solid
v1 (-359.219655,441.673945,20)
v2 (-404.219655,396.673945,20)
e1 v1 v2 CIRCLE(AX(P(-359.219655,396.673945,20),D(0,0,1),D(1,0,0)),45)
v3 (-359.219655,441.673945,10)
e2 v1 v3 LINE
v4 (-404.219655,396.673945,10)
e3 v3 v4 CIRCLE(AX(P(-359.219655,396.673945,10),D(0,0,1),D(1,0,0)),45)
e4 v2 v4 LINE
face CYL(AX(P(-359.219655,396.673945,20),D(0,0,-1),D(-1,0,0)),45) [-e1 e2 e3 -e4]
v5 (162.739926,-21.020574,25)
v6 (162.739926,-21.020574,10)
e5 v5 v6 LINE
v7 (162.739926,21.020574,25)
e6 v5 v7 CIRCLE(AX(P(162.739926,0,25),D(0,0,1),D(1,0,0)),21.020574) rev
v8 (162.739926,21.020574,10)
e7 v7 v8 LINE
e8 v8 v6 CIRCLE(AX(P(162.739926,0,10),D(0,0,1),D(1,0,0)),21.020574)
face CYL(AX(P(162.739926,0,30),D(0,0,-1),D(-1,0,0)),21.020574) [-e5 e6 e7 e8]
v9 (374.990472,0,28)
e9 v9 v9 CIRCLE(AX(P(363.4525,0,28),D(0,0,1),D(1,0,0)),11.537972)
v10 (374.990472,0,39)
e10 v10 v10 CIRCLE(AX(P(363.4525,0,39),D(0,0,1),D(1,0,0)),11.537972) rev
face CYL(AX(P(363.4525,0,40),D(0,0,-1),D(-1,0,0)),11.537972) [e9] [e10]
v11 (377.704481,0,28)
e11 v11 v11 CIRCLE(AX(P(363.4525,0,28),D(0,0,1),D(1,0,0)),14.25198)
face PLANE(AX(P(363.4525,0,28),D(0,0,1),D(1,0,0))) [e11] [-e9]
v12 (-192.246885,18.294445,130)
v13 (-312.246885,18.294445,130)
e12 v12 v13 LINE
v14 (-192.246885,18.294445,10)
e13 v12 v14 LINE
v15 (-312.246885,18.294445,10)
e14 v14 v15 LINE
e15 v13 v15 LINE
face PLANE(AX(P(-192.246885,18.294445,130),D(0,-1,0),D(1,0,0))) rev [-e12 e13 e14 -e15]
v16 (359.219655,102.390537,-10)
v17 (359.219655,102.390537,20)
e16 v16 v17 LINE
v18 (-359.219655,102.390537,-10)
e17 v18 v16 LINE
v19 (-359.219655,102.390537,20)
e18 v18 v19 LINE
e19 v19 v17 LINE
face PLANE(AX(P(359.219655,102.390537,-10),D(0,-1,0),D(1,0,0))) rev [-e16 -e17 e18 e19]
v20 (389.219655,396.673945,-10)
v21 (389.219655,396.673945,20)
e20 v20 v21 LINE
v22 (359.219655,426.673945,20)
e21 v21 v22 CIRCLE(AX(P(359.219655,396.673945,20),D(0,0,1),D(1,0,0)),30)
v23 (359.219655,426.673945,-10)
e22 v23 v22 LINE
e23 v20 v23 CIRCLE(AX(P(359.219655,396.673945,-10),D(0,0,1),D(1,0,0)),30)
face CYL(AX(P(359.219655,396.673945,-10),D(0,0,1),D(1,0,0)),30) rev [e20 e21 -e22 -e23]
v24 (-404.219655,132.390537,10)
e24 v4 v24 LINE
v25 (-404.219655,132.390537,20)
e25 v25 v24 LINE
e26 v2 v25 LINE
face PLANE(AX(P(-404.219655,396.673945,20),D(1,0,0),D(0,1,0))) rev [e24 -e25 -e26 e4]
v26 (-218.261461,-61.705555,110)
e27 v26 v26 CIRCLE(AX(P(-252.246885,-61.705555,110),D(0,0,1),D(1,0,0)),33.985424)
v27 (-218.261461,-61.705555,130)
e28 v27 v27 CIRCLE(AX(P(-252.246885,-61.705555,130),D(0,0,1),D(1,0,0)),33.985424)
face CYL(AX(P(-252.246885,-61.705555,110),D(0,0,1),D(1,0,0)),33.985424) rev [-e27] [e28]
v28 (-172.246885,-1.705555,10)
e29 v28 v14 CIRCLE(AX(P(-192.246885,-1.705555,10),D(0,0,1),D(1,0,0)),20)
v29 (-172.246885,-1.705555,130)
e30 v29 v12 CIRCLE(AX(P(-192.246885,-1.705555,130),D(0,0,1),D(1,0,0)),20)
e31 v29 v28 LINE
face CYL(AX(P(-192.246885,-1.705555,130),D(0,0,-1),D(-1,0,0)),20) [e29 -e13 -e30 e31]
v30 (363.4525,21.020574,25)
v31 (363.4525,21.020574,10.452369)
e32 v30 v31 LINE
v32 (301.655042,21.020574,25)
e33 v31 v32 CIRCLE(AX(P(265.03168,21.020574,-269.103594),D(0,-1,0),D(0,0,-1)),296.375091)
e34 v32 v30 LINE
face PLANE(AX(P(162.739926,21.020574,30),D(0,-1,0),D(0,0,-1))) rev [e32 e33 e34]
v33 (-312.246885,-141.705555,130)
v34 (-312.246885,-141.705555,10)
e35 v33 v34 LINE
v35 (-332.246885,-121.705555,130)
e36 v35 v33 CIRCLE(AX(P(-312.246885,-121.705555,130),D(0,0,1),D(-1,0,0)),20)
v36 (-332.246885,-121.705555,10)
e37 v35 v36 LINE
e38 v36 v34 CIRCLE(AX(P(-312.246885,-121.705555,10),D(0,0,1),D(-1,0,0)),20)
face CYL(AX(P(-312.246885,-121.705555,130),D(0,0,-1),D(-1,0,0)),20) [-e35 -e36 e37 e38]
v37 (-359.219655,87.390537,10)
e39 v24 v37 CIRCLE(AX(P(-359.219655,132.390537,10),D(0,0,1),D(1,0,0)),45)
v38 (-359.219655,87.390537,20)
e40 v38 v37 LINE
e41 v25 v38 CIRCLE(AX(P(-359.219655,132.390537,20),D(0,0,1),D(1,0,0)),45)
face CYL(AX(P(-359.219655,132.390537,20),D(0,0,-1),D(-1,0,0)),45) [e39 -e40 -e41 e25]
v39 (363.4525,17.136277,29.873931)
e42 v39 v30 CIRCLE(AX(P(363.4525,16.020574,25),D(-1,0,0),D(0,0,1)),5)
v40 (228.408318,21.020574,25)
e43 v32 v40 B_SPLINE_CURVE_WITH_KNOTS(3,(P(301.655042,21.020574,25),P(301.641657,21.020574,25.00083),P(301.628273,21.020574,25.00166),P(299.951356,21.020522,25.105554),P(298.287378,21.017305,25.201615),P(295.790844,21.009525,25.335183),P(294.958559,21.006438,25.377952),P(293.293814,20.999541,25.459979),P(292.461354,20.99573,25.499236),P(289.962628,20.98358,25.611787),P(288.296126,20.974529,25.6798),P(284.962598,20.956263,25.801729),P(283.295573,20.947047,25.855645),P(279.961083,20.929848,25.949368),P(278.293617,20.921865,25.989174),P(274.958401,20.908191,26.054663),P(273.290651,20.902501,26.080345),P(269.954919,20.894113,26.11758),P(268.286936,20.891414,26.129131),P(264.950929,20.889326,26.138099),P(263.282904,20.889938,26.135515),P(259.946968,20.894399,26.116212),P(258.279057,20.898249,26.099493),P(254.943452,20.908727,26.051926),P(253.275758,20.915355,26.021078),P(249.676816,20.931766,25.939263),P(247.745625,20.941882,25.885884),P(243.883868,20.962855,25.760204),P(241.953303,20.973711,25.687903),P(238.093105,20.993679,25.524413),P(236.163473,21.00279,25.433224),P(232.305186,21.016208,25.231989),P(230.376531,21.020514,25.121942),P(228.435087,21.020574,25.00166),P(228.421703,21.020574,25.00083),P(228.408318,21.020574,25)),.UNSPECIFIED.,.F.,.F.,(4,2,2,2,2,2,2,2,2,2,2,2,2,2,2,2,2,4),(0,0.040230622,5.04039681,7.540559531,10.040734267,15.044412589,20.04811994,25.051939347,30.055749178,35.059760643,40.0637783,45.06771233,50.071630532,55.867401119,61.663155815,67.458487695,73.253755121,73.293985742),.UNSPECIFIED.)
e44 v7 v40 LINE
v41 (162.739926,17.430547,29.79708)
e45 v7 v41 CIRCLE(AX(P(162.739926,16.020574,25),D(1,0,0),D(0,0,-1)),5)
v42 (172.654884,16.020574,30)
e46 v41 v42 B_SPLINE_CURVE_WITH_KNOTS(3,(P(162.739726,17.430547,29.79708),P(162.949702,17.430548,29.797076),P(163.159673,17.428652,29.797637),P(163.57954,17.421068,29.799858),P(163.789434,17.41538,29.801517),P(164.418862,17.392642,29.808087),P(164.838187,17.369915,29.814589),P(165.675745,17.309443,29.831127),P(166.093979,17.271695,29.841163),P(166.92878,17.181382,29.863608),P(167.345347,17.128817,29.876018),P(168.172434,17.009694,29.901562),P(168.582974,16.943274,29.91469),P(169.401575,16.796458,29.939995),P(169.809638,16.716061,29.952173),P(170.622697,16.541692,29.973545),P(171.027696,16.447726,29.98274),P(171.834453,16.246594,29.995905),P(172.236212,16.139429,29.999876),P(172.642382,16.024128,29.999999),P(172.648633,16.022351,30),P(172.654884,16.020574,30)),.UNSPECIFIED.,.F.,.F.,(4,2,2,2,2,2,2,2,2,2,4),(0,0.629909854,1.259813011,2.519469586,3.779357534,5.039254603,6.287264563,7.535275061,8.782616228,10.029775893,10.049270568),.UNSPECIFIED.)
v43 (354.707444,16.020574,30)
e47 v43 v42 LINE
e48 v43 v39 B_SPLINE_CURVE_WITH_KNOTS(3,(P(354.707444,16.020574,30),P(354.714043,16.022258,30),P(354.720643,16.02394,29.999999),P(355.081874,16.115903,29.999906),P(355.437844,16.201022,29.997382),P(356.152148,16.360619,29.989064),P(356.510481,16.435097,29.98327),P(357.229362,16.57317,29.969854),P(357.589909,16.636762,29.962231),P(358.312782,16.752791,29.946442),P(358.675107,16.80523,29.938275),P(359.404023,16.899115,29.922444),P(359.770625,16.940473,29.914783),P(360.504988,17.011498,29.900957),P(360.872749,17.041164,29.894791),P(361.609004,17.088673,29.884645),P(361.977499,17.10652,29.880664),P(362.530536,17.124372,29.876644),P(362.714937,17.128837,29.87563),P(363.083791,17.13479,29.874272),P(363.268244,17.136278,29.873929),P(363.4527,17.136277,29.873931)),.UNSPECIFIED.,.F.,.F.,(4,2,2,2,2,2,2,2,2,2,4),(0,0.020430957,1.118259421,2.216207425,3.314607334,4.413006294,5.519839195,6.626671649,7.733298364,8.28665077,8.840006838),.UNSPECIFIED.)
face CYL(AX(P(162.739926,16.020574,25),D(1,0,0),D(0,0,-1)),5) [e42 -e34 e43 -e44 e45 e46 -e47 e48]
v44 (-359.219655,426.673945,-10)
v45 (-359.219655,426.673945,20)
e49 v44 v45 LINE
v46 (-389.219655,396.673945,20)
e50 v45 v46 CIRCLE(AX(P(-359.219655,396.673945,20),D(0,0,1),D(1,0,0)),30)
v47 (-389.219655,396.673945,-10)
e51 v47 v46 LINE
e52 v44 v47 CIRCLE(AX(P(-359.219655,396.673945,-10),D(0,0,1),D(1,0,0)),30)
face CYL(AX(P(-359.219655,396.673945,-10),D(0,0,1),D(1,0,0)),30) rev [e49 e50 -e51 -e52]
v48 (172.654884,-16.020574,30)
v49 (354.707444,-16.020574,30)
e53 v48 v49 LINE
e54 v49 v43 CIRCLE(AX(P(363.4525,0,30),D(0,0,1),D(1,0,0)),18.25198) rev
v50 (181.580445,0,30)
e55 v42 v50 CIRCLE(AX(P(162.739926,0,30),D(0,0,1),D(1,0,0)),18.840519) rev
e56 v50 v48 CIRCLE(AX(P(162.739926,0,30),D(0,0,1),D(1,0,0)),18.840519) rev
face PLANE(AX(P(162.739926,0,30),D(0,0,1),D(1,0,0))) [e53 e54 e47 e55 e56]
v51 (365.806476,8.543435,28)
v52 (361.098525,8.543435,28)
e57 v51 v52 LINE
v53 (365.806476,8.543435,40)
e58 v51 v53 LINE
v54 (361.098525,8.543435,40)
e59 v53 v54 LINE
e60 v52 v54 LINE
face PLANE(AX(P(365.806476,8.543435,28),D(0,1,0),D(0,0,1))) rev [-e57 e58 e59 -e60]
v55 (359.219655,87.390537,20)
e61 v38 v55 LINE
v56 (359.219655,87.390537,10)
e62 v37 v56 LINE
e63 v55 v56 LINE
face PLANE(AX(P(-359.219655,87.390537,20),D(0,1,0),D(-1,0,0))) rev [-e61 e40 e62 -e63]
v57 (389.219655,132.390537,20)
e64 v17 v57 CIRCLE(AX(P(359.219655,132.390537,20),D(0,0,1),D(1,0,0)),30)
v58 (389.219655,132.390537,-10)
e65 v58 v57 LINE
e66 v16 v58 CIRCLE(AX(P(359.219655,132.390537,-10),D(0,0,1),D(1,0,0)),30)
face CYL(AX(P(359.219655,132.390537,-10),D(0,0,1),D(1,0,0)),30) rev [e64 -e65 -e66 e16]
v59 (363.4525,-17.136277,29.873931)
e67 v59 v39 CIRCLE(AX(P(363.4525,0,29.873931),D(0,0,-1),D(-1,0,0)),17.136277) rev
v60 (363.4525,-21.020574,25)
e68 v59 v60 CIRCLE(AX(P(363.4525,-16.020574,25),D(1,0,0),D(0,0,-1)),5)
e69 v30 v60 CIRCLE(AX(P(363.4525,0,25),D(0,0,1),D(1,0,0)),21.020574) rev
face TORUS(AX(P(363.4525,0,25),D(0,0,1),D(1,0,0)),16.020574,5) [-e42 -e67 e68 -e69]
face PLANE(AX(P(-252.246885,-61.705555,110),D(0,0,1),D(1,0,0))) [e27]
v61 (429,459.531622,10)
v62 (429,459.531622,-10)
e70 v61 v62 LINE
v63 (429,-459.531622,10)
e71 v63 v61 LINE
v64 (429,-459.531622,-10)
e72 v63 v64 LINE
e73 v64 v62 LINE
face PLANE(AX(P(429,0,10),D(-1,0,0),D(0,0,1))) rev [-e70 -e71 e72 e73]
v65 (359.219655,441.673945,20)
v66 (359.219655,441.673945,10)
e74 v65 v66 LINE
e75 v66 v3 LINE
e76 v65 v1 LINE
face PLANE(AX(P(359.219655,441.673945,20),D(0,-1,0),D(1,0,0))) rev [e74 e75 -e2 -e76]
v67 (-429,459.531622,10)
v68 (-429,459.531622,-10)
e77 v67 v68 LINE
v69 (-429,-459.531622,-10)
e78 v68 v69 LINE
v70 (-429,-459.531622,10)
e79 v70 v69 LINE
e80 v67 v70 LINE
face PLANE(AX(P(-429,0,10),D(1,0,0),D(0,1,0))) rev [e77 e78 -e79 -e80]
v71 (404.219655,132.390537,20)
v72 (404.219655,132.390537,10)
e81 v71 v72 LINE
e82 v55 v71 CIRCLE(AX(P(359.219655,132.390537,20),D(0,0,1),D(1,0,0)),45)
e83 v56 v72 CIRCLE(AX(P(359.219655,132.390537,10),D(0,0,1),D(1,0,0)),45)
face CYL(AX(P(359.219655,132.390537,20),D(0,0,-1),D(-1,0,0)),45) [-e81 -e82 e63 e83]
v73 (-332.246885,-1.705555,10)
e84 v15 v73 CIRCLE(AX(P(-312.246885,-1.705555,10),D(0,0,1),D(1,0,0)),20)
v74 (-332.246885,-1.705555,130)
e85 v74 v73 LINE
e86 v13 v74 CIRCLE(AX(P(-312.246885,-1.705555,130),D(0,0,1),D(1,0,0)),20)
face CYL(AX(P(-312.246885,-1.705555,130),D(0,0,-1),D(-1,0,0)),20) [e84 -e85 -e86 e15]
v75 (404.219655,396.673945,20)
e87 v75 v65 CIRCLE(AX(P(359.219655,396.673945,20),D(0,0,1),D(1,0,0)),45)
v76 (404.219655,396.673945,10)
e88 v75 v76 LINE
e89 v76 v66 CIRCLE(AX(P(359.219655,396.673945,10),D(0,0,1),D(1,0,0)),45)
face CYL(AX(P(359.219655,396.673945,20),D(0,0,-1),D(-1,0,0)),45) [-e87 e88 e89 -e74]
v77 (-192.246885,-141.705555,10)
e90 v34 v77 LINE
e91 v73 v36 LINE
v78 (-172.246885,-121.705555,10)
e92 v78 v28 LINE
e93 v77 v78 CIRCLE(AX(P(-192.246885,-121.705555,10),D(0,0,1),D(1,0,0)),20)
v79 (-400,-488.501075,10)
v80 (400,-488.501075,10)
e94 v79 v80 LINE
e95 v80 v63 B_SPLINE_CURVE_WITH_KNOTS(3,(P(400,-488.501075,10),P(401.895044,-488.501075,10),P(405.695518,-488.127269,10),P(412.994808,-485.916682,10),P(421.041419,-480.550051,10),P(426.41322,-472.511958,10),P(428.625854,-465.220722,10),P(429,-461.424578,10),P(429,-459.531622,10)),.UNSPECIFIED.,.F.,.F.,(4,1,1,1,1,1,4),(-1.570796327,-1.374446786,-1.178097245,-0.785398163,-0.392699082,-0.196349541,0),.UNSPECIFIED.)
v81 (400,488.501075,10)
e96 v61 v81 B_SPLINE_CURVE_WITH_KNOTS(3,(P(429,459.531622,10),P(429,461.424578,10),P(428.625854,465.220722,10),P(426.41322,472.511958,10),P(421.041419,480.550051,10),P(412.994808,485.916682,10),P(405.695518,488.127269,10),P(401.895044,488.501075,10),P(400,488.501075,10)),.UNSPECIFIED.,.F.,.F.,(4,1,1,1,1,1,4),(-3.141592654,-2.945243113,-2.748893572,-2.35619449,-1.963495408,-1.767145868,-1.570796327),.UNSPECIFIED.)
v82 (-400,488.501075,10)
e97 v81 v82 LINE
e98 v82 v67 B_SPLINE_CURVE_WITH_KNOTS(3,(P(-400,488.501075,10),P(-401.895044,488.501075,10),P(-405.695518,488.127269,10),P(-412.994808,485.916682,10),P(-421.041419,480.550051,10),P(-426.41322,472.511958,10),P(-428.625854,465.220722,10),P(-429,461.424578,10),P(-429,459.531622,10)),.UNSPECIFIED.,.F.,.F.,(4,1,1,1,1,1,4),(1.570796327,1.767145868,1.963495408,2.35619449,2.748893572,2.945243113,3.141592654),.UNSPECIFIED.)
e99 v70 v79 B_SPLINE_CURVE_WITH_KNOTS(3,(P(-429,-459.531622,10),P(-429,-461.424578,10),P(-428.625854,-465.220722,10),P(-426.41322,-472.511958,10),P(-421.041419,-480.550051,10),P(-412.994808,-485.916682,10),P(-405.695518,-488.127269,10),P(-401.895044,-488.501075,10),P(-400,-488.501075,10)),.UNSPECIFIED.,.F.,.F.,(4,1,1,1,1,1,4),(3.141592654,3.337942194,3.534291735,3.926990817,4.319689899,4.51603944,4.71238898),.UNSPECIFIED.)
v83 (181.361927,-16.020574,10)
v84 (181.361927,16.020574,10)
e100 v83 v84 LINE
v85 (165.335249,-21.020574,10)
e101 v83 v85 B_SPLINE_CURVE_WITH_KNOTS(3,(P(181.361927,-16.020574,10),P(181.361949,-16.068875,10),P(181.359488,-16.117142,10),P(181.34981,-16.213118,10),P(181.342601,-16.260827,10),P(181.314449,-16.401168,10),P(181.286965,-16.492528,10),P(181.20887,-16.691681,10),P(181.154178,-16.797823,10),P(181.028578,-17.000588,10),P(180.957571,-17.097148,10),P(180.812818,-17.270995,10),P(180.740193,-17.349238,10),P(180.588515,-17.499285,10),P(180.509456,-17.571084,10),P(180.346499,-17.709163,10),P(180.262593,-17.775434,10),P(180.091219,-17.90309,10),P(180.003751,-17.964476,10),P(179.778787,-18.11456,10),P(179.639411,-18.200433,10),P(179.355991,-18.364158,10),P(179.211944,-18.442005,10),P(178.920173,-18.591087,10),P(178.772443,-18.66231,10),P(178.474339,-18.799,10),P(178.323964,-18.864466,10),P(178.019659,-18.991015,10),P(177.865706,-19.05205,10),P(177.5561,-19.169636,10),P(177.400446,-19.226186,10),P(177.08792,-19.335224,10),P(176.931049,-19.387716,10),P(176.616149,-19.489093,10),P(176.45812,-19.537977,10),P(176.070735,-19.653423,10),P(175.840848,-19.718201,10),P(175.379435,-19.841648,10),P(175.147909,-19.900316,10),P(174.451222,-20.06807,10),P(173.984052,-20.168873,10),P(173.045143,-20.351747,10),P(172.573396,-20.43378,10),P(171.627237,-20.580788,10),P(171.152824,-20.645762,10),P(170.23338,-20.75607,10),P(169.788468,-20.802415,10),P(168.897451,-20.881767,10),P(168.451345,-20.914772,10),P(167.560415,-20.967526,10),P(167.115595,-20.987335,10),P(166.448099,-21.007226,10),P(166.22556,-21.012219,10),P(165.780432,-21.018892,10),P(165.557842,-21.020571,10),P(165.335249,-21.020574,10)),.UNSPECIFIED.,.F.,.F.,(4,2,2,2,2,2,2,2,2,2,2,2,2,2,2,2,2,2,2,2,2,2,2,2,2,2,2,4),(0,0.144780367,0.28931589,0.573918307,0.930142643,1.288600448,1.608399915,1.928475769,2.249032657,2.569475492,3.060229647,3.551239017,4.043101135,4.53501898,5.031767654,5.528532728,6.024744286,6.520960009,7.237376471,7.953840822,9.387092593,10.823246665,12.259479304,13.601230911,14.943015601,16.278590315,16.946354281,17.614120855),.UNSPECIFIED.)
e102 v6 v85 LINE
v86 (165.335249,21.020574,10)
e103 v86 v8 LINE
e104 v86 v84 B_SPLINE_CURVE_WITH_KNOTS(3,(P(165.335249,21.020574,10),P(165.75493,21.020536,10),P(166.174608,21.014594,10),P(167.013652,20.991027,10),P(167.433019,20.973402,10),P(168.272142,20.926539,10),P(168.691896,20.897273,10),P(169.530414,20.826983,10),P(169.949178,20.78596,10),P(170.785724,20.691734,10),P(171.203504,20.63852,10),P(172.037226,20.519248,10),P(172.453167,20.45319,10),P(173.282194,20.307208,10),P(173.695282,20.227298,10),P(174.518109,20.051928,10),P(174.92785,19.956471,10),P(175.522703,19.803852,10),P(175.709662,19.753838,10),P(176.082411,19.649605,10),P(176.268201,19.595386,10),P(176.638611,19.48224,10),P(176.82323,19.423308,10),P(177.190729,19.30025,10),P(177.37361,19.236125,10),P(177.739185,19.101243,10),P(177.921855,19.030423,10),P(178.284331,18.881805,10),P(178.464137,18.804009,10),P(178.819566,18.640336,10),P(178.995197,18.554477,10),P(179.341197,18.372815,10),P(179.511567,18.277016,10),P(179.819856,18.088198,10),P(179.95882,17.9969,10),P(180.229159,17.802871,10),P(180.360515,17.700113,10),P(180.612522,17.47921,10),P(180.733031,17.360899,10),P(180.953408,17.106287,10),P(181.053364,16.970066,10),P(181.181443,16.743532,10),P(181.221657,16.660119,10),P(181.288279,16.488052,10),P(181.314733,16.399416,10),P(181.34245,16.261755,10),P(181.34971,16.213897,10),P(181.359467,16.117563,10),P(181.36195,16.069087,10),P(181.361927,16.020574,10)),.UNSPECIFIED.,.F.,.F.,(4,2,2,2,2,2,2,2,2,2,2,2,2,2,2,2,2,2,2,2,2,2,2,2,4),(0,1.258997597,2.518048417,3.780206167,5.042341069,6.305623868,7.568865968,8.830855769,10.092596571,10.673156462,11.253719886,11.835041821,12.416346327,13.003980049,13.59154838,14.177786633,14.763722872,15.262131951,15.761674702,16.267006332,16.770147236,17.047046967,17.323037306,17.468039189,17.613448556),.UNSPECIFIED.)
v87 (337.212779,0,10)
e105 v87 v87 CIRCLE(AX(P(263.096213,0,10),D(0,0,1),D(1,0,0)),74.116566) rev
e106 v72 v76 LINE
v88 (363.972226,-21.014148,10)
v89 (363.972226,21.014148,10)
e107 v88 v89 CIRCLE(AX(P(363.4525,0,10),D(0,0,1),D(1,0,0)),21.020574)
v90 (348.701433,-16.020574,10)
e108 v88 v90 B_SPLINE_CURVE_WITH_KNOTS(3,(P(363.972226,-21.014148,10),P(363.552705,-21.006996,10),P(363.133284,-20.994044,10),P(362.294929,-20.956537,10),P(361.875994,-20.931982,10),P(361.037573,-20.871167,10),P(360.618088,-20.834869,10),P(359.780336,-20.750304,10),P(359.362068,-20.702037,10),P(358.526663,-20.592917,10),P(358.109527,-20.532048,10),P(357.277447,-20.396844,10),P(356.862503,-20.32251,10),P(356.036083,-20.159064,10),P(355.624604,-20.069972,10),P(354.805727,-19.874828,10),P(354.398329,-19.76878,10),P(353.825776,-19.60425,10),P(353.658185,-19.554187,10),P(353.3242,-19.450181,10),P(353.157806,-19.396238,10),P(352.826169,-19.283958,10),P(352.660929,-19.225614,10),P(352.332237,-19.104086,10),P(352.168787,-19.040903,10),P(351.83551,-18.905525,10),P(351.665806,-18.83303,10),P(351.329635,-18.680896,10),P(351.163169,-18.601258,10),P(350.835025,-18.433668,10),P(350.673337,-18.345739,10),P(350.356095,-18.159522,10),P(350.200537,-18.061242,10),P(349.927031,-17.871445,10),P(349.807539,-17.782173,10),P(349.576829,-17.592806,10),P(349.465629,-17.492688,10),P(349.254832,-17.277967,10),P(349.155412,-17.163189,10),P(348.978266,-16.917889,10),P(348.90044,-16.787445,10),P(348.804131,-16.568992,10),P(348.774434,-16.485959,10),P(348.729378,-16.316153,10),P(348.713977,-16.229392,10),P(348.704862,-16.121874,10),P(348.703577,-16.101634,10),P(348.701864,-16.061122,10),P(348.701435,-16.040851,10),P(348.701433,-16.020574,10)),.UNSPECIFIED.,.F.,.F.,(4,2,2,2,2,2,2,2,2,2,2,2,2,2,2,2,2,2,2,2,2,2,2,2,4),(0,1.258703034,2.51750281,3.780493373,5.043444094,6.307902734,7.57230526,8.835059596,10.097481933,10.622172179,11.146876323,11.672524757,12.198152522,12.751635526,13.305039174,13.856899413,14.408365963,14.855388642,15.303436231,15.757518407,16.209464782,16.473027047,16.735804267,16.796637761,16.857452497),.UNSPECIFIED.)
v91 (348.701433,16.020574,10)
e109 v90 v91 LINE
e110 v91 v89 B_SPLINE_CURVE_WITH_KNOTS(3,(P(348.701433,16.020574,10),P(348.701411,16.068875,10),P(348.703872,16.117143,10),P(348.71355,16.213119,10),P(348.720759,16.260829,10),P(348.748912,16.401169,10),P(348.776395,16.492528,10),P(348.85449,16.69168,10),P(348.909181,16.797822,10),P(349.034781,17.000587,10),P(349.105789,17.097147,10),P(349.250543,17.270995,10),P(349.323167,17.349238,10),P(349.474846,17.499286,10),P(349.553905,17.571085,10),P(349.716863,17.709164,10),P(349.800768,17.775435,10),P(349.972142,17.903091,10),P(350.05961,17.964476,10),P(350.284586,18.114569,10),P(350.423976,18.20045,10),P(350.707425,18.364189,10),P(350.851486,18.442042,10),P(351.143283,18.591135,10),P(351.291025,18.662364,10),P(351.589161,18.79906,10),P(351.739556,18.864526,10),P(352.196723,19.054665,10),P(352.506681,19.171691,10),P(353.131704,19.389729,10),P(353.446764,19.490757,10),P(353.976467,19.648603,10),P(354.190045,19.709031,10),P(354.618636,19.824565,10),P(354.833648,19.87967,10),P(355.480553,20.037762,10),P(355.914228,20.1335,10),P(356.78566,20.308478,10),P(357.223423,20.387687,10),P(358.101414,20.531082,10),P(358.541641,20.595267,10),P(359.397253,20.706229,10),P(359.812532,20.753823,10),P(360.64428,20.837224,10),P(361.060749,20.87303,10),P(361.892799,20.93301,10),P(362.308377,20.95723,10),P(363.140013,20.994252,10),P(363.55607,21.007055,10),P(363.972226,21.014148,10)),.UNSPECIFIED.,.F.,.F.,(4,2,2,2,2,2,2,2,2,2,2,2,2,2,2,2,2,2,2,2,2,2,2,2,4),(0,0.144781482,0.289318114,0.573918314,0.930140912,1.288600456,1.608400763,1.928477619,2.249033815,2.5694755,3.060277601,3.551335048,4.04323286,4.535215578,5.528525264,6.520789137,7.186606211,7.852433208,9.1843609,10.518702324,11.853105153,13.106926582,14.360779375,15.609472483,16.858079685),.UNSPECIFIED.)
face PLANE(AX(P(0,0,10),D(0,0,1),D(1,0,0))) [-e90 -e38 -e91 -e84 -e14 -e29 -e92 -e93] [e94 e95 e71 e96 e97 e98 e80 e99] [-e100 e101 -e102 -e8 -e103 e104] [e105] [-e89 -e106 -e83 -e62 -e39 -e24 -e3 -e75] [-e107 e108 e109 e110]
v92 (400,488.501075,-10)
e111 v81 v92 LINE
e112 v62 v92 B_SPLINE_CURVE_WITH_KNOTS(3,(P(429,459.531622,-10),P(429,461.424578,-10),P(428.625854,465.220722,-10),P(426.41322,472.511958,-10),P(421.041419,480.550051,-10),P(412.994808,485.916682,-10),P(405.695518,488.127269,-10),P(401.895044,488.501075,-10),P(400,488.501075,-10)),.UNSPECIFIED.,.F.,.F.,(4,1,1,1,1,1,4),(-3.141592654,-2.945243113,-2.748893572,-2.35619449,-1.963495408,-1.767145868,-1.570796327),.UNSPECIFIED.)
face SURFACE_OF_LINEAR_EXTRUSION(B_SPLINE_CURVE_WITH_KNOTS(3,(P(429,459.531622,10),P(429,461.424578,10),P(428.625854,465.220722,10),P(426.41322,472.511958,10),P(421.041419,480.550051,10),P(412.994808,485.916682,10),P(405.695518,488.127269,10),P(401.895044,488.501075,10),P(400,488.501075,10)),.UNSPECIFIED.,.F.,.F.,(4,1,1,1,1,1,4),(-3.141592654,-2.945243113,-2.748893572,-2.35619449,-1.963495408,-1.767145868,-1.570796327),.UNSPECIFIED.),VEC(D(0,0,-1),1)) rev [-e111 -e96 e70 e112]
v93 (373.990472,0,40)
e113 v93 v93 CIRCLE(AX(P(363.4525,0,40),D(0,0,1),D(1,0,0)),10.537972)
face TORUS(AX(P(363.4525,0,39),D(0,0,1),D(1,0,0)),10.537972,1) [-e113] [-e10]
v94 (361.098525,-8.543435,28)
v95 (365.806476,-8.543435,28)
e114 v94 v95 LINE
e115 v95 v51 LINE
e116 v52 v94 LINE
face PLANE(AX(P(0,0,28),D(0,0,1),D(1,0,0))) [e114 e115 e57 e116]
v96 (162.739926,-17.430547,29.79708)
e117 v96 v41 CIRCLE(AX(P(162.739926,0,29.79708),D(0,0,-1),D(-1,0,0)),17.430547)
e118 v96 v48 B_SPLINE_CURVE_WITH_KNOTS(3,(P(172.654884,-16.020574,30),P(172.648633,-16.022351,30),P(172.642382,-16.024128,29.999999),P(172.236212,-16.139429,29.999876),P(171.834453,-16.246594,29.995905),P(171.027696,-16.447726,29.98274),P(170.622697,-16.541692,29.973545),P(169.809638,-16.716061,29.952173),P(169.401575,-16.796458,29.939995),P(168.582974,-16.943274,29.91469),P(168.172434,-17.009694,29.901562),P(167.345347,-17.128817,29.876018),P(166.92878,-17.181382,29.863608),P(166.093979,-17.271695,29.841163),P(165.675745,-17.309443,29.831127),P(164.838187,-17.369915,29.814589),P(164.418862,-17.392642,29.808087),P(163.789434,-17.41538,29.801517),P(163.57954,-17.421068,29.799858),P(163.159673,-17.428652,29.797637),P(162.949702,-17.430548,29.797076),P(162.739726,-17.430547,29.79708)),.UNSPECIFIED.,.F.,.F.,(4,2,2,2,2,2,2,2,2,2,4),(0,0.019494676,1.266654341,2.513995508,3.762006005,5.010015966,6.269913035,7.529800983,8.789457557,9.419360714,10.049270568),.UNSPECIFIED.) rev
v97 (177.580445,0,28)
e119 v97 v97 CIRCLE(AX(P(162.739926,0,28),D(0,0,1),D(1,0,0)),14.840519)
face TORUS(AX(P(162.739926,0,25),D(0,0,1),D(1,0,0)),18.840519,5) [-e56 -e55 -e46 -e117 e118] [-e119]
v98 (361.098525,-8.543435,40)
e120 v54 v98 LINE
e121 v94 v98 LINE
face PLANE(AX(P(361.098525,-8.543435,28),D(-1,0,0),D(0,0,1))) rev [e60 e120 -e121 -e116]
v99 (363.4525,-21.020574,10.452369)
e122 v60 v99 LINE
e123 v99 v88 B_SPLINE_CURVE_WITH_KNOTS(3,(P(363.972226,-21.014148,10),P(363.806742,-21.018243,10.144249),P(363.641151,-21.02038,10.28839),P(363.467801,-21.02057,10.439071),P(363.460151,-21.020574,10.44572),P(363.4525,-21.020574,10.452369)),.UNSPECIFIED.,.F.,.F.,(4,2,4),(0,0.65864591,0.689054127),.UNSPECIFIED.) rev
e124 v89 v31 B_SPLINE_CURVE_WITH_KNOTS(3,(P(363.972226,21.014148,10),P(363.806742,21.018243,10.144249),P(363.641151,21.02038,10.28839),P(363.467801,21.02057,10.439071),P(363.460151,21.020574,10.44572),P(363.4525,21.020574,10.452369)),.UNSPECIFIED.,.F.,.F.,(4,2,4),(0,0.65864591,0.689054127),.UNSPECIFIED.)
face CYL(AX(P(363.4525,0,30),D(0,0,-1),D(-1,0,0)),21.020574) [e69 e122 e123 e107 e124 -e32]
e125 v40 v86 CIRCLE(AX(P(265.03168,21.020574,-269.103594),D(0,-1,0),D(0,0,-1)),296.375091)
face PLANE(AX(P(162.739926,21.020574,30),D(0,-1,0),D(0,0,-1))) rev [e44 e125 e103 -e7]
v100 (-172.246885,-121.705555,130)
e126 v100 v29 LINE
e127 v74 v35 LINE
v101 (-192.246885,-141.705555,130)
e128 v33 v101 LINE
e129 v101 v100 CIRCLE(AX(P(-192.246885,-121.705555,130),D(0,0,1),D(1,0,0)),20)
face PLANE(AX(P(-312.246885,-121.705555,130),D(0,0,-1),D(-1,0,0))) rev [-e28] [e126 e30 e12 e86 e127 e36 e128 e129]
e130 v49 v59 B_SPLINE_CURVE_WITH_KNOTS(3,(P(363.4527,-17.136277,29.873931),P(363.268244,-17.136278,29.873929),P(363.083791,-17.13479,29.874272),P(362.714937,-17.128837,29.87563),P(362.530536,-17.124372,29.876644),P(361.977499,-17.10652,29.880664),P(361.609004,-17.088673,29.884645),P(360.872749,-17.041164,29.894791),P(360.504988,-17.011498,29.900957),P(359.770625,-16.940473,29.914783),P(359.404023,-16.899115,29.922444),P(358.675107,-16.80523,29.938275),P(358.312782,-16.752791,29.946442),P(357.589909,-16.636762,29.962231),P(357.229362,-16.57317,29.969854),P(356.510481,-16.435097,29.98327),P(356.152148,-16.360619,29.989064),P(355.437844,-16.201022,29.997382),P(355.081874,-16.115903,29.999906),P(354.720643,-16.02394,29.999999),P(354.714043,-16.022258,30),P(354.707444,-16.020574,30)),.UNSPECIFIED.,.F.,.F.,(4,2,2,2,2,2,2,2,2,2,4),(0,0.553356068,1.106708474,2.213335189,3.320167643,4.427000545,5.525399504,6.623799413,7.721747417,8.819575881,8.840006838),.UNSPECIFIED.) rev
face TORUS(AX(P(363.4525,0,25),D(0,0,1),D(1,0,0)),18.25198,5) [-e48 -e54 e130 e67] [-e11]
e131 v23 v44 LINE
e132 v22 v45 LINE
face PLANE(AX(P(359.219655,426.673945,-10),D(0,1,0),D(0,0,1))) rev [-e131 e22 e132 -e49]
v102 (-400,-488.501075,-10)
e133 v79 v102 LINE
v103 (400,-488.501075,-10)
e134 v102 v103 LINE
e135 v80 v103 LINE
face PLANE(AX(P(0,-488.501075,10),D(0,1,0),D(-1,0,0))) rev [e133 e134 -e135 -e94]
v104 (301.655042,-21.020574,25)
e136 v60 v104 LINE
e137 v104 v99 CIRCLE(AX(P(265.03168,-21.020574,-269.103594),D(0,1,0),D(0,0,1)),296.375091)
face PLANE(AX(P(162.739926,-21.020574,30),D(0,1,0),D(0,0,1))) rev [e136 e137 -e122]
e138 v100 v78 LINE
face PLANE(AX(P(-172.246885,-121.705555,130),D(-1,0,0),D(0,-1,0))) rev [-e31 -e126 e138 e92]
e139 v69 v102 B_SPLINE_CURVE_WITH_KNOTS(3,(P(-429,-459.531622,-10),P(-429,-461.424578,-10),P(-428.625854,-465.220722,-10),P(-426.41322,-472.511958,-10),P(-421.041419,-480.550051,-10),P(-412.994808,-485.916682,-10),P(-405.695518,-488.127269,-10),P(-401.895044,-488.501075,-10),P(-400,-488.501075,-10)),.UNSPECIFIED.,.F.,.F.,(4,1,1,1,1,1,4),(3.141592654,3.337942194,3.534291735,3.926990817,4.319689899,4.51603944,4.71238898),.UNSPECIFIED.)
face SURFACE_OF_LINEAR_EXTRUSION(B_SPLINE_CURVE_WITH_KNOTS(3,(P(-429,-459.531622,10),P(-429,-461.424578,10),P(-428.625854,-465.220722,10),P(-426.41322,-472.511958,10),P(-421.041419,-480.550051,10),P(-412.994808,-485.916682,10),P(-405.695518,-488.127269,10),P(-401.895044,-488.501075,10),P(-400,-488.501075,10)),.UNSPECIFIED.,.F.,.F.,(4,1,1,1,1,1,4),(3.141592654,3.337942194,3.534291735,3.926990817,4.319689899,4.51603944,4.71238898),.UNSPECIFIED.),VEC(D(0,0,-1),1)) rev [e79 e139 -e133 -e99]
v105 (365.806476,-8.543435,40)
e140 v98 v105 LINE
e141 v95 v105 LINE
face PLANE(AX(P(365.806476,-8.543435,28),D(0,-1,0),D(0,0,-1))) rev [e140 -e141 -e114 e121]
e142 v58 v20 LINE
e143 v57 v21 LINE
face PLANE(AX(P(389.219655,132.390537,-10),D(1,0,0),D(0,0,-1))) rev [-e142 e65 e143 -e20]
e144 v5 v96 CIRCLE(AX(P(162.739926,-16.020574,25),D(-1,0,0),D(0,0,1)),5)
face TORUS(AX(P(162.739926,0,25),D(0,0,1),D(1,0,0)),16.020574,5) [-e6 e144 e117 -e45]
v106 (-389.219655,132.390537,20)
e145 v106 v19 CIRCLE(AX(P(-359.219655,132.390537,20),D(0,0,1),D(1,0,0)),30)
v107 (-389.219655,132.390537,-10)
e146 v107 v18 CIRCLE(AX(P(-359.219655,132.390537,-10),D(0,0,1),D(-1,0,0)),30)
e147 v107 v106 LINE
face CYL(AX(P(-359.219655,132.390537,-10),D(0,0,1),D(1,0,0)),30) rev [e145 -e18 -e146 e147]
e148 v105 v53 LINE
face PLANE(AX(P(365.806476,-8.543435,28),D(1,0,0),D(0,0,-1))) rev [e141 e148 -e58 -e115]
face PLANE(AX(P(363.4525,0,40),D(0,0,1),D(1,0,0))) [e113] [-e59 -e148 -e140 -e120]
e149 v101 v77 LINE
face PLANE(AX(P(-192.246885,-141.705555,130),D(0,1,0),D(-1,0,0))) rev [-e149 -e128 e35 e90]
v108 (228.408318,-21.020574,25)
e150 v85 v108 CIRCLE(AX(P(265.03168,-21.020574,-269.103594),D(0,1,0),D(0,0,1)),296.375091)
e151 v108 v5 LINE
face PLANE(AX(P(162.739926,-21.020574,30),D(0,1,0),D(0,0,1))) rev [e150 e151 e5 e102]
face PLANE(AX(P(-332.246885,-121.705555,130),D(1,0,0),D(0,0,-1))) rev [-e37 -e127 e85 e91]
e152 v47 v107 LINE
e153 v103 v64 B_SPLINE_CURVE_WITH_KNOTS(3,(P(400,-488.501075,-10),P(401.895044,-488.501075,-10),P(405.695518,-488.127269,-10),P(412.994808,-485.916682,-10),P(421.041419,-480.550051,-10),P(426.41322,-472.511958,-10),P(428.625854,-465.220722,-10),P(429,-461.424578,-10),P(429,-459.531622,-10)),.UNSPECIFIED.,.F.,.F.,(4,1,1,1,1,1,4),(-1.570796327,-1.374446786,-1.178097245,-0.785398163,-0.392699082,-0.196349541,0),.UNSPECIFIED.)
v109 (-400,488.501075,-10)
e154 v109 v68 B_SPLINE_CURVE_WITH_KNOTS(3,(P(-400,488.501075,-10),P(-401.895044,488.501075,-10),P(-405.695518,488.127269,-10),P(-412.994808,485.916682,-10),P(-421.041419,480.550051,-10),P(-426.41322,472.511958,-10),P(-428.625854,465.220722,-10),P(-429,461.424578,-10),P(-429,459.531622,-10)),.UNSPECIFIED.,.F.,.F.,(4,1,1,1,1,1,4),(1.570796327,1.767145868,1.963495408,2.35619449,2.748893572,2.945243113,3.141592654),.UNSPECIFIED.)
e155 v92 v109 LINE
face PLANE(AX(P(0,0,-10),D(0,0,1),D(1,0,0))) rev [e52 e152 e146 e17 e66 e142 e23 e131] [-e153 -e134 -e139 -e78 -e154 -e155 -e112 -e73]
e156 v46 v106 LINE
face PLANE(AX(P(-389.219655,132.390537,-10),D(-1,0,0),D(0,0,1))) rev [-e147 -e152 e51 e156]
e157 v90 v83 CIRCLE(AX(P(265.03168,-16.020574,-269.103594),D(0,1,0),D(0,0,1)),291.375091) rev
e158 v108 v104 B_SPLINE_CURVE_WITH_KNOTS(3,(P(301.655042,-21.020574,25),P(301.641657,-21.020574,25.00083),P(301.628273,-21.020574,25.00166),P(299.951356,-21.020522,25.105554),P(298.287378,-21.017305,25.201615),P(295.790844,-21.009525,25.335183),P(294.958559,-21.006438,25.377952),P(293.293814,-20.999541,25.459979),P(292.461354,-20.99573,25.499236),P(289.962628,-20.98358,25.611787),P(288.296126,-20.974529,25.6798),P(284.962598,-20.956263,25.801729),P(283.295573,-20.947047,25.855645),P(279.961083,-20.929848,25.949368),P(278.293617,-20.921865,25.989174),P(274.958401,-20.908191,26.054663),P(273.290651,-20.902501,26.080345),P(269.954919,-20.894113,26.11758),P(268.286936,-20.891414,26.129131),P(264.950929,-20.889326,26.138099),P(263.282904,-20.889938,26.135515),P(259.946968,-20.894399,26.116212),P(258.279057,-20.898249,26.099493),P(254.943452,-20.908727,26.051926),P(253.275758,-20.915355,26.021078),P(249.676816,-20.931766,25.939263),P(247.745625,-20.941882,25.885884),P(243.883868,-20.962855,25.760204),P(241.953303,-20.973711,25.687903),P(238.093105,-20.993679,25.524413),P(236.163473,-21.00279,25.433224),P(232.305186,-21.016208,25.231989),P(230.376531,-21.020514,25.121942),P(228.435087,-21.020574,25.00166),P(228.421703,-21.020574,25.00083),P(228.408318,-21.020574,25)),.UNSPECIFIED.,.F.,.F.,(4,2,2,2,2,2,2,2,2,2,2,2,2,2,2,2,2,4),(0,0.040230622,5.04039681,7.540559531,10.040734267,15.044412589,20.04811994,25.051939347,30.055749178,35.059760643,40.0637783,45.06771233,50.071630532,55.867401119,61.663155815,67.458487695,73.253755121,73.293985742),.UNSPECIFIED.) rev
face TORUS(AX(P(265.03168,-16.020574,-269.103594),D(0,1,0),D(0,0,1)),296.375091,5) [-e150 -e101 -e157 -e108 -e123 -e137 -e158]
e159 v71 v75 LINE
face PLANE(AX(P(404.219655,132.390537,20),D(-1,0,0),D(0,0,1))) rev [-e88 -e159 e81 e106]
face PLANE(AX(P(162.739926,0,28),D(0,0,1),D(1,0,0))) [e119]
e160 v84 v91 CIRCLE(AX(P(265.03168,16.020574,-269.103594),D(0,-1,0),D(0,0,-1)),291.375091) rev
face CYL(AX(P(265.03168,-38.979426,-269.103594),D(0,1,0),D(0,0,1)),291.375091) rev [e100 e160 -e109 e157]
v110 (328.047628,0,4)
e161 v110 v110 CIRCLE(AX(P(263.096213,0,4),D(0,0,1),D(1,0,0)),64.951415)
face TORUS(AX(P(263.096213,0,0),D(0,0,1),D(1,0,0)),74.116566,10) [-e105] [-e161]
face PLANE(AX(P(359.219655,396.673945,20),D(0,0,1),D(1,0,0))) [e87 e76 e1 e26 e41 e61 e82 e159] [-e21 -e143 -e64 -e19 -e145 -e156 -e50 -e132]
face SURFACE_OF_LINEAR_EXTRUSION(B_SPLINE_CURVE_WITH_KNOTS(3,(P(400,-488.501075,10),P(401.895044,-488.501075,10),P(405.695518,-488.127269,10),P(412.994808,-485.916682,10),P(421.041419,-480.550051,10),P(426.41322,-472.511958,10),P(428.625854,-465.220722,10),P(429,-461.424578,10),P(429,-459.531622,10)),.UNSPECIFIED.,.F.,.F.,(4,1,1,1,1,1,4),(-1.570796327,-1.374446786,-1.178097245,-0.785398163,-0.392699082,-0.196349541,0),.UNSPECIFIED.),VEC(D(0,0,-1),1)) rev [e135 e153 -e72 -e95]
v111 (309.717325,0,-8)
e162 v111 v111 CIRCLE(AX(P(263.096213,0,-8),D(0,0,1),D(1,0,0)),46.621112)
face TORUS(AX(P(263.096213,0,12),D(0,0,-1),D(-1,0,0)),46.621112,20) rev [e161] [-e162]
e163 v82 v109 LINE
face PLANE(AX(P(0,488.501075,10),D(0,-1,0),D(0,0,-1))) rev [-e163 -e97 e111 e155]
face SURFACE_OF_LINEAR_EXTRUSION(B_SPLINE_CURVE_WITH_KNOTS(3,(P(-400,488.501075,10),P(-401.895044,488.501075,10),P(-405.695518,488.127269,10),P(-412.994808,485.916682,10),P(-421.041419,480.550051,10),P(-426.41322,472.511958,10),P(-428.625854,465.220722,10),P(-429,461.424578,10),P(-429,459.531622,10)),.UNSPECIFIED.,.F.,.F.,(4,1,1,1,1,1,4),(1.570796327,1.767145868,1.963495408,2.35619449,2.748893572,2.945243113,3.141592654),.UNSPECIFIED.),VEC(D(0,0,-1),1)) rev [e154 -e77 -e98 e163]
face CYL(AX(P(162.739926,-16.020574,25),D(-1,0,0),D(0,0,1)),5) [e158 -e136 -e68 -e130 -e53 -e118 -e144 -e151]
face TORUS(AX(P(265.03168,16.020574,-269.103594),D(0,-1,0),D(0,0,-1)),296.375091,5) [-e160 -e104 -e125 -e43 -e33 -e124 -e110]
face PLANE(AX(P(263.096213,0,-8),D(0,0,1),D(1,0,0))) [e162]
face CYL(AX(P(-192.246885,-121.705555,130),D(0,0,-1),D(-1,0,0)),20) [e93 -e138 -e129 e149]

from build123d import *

# Parameters (mm, degrees)
BOSS_EXTRUDE1_DEPTH = 10
CUT_EXTRUDE1_DEPTH  = 651.441619738
BOSS_EXTRUDE2_DEPTH = 120
SKETCH5_R           = 33.985423714
CUT_EXTRUDE2_DEPTH  = 20
BOSS_EXTRUDE3_DEPTH = 20
SKETCH9_R           = 66.520860748
CUT_EXTRUDE5_DEPTH  = 18
CUT_EXTRUDE6_DEPTH  = 60
FILLET1_R           = 20
FILLET2_R           = 10
SKETCH11_R          = 14.840519461
SKETCH11_R_2        = 14.251980432
CUT_EXTRUDE7_DEPTH  = 2
SKETCH12_R          = 11.537971811
BOSS_EXTRUDE4_DEPTH = 12
SKETCH13_W          = 4.707950979
SKETCH13_H          = 17.086870266
CUT_EXTRUDE8_DEPTH  = 12
FILLET3_R           = 5
FILLET4_R           = 1
BOSS_EXTRUDE5_START = 10
BOSS_EXTRUDE5_DEPTH = 10


with BuildPart() as part:
    # Sketch1 → Boss-Extrude1 (new, symmetric)
    with BuildSketch(Plane.XY):
        with BuildLine():
            Line((429, -459.531621643), (429, 459.531621643))
            add(Edge.make_bspline(
                [(429, 459.531621643), (429, 461.424578135), (428.625853979, 465.220721823), (426.413219675, 472.511957853), (421.041418821, 480.550051014), (412.994808473, 485.916682286), (405.695517593, 488.127269147), (401.895043512, 488.501075229), (400, 488.501075229)],
                knots=[-3.141592654, -3.141592654, -3.141592654, -3.141592654, -2.945243113, -2.748893572, -2.35619449, -1.963495408, -1.767145868, -1.570796327, -1.570796327, -1.570796327, -1.570796327], degree=3))
            Line((400, 488.501075229), (-400, 488.501075229))
            add(Edge.make_bspline(
                [(-400, 488.501075229), (-401.895043512, 488.501075229), (-405.695517593, 488.127269147), (-412.994808473, 485.916682286), (-421.041418821, 480.550051014), (-426.413219675, 472.511957853), (-428.625853979, 465.220721823), (-429, 461.424578135), (-429, 459.531621643)],
                knots=[1.570796327, 1.570796327, 1.570796327, 1.570796327, 1.767145868, 1.963495408, 2.35619449, 2.748893572, 2.945243113, 3.141592654, 3.141592654, 3.141592654, 3.141592654], degree=3))
            Line((-429, 459.531621643), (-429, -459.531621643))
            add(Edge.make_bspline(
                [(-429, -459.531621643), (-429, -461.424578135), (-428.625853979, -465.220721823), (-426.413219675, -472.511957853), (-421.041418821, -480.550051014), (-412.994808473, -485.916682286), (-405.695517593, -488.127269147), (-401.895043512, -488.501075229), (-400, -488.501075229)],
                knots=[3.141592654, 3.141592654, 3.141592654, 3.141592654, 3.337942194, 3.534291735, 3.926990817, 4.319689899, 4.51603944, 4.71238898, 4.71238898, 4.71238898, 4.71238898], degree=3))
            Line((-400, -488.501075229), (400, -488.501075229))
            add(Edge.make_bspline(
                [(400, -488.501075229), (401.895043512, -488.501075229), (405.695517593, -488.127269147), (412.994808473, -485.916682286), (421.041418821, -480.550051014), (426.413219675, -472.511957853), (428.625853979, -465.220721823), (429, -461.424578135), (429, -459.531621643)],
                knots=[-1.570796327, -1.570796327, -1.570796327, -1.570796327, -1.374446786, -1.178097245, -0.785398163, -0.392699082, -0.196349541, 0, 0, 0, 0], degree=3))
        make_face()
    extrude(amount=BOSS_EXTRUDE1_DEPTH, both=True)

    # Sketch2 → Cut-Extrude1 (cut, through all)
    with BuildSketch(Plane.XY.offset(10)):
        with BuildLine():
            Line((359.219655333, 102.390536508), (-359.219655333, 102.390536508))
            ThreePointArc((-359.219655333, 102.390536508), (-380.432858769, 111.177333072), (-389.219655333, 132.390536508))
            Line((-389.219655333, 132.390536508), (-389.219655333, 396.67394534))
            ThreePointArc((-389.219655333, 396.67394534), (-380.432858769, 417.887148775), (-359.219655333, 426.67394534))
            Line((-359.219655333, 426.67394534), (359.219655333, 426.67394534))
            ThreePointArc((359.219655333, 426.67394534), (380.432858769, 417.887148775), (389.219655333, 396.67394534))
            Line((389.219655333, 396.67394534), (389.219655333, 132.390536508))
            ThreePointArc((389.219655333, 132.390536508), (380.432858769, 111.177333072), (359.219655333, 102.390536508))
        make_face()
    extrude(amount=-CUT_EXTRUDE1_DEPTH, mode=Mode.SUBTRACT)

    # Sketch4 → Boss-Extrude2 (add)
    with BuildSketch(Plane.XY.offset(10)):
        with BuildLine():
            Line((-192.246884641, -141.705555114), (-312.246884641, -141.705555114))
            ThreePointArc((-312.246884641, -141.705555114), (-326.389020265, -135.847690738), (-332.246884641, -121.705555114))
            Line((-332.246884641, -121.705555114), (-332.246884641, -1.705555114))
            ThreePointArc((-332.246884641, -1.705555114), (-326.389020265, 12.43658051), (-312.246884641, 18.294444886))
            Line((-312.246884641, 18.294444886), (-192.246884641, 18.294444886))
            ThreePointArc((-192.246884641, 18.294444886), (-178.104749017, 12.43658051), (-172.246884641, -1.705555114))
            Line((-172.246884641, -1.705555114), (-172.246884641, -121.705555114))
            ThreePointArc((-172.246884641, -121.705555114), (-178.104749017, -135.847690738), (-192.246884641, -141.705555114))
        make_face()
    extrude(amount=BOSS_EXTRUDE2_DEPTH)

    # Sketch5 → Cut-Extrude2 (cut)
    with BuildSketch(Plane.XY.offset(130)):
        with Locations((-252.246884641, -61.705555114)):
            Circle(SKETCH5_R)
    extrude(amount=-CUT_EXTRUDE2_DEPTH, mode=Mode.SUBTRACT)

    # Sketch6 → Boss-Extrude3 (add)
    with BuildSketch(Plane.XY.offset(10)):
        with BuildLine():
            Line((162.739925575, 21.02057372), (363.452500451, 21.02057372))
            ThreePointArc((363.452500451, 21.02057372), (384.473074171, 0), (363.452500451, -21.02057372))
            Line((363.452500451, -21.02057372), (162.739925575, -21.02057372))
            ThreePointArc((162.739925575, -21.02057372), (141.719351855, 0), (162.739925575, 21.02057372))
        make_face()
    extrude(amount=BOSS_EXTRUDE3_DEPTH)

    # Sketch9 → Cut-Extrude5 (cut)
    with BuildSketch(Plane.XY.offset(10)):
        with Locations((263.096213013, 0)):
            Circle(SKETCH9_R)
    extrude(amount=-CUT_EXTRUDE5_DEPTH, mode=Mode.SUBTRACT)

    # Sketch10 → Cut-Extrude6 (cut)
    with BuildSketch(Plane(origin=(0, 21.02057372, 0), x_dir=(1, 0, 0), z_dir=(0, 1, 0))):
        with BuildLine():
            Line((181.36192728, -10), (348.70143273, -10))
            ThreePointArc((348.70143273, -10), (265.031680005, -22.271497094), (181.36192728, -10))
        make_face()
    extrude(amount=-CUT_EXTRUDE6_DEPTH, mode=Mode.SUBTRACT)

    # Fillet1
    # the kernel refuses this fillet: 20 mm, written as the material it adds along each edge
    with BuildSketch(Plane(origin=(263.096213013, 0, -8), x_dir=(1, 0, 0), z_dir=(0, -1, 0))) as fillet1_piece_1:
        with BuildLine():
            CenterArc((46.621112006, 20), FILLET1_R, 270, 84.260829523)
            Line((46.621112006, 0), (46.621112006, -0.4))
            Line((46.621112006, -0.4), (66.520860748, -0.4))
            Line((66.520860748, -0.4), (66.920860748, 0))
            ThreePointArc((66.920860748, 0), (66.920860748, 9), (66.918855723, 17.96))
            Line((66.918855723, 17.96), (66.520860748, 18))
        make_face()
    revolve(axis=Axis((263.096213013, 0, -8), (0, 0, 1)))

    # Fillet2
    fillet2_edges = [part.edges().sort_by_distance(p)[0] for p in [
        (196.575352264, 0, 10),
    ]]
    fillet(fillet2_edges, radius=FILLET2_R)

    # Sketch11 → Cut-Extrude7 (cut)
    with BuildSketch(Plane.XY.offset(30)):
        with Locations((162.739925575, 0)):
            Circle(SKETCH11_R)
        with Locations((363.452500451, 0)):
            Circle(SKETCH11_R_2)
    extrude(amount=-CUT_EXTRUDE7_DEPTH, mode=Mode.SUBTRACT)

    # Sketch12 → Boss-Extrude4 (add)
    with BuildSketch(Plane.XY.offset(28)):
        with Locations((363.452500451, 0)):
            Circle(SKETCH12_R)
    extrude(amount=BOSS_EXTRUDE4_DEPTH)

    # Sketch13 → Cut-Extrude8 (cut)
    with BuildSketch(Plane.XY.offset(40)):
        with Locations((363.45250045, 0)):
            Rectangle(SKETCH13_W, SKETCH13_H)
    extrude(amount=-CUT_EXTRUDE8_DEPTH, mode=Mode.SUBTRACT)

    # Fillet3
    # the kernel refuses this fillet: 5 mm, written as the material it takes off along each edge
    with BuildSketch(Plane(origin=(265.031680005, -21.02057372, -269.103593774), x_dir=(-0.35619186433056876, 0, 0.9344128401219204), z_dir=(-0.9344128401219204, 0, -0.35619186433056876))) as fillet3_piece_1_section:
        with BuildLine():
            CenterArc((291.375090869 + FILLET3_R, FILLET3_R), FILLET3_R, 180, 90)
            Line((291.375090869, FILLET3_R), (291.375090869 - FILLET3_R * 0.02, FILLET3_R))
            Line((291.375090869 - FILLET3_R * 0.02, FILLET3_R), (291.375090869 - FILLET3_R * 0.02, -FILLET3_R * 0.02))
            Line((291.375090869 - FILLET3_R * 0.02, -FILLET3_R * 0.02), (291.375090869 + FILLET3_R, -FILLET3_R * 0.02))
            Line((291.375090869 + FILLET3_R, -FILLET3_R * 0.02), (291.375090869 + FILLET3_R, 0))
        make_face()
    fillet3_piece_1 = revolve(axis=Axis((265.031680005, -21.02057372, -269.103593774), (0, 1, 0)), revolution_arc=41.733017363, mode=Mode.PRIVATE)
    fillet3_piece_1 = split(fillet3_piece_1, bisect_by=Plane(origin=(265.031680005, -21.02057372, 10), z_dir=(0, 0, 1)), keep=Keep.TOP, mode=Mode.PRIVATE)
    add(fillet3_piece_1, mode=Mode.SUBTRACT)
    with BuildSketch(Plane(origin=(265.031680005, 21.02057372, -269.103593774), x_dir=(0.3561918643305686, 0, 0.9344128401219206), z_dir=(0.9344128401219206, 0, -0.3561918643305686))) as fillet3_piece_2_section:
        with BuildLine():
            CenterArc((291.375090869 + FILLET3_R, FILLET3_R), FILLET3_R, 180, 90)
            Line((291.375090869 + FILLET3_R, 0), (291.375090869 + FILLET3_R, -FILLET3_R * 0.02))
            Line((291.375090869 + FILLET3_R, -FILLET3_R * 0.02), (291.375090869 - FILLET3_R * 0.02, -FILLET3_R * 0.02))
            Line((291.375090869 - FILLET3_R * 0.02, -FILLET3_R * 0.02), (291.375090869 - FILLET3_R * 0.02, FILLET3_R))
            Line((291.375090869 - FILLET3_R * 0.02, FILLET3_R), (291.375090869, FILLET3_R))
        make_face()
    fillet3_piece_2 = revolve(axis=Axis((265.031680005, 21.02057372, -269.103593774), (0, -1, 0)), revolution_arc=41.733017363, mode=Mode.PRIVATE)
    fillet3_piece_2 = split(fillet3_piece_2, bisect_by=Plane(origin=(265.031680005, 21.02057372, 10), z_dir=(0, 0, 1)), keep=Keep.TOP, mode=Mode.PRIVATE)
    add(fillet3_piece_2, mode=Mode.SUBTRACT)
    with BuildSketch(Plane(origin=(162.739925575, 0, 30), x_dir=(1, 0, 0), z_dir=(0, -1, 0))) as fillet3_piece_3:
        with BuildLine():
            CenterArc((18.840519461, -5), FILLET3_R, 90, 53.130102354)
            Line((14.840519461, -2), (14.760519461, -1.94))
            ThreePointArc((14.760519461, -1.94), (14.740519461, -1), (14.740519461, 0))
            Line((14.740519461, 0), (14.840519461, 0.1))
            Line((14.840519461, 0.1), (18.840519461, 0.1))
            Line((18.840519461, 0.1), (18.840519461, 0))
        make_face()
    revolve(axis=Axis((162.739925575, 0, 30), (0, 0, 1)), mode=Mode.SUBTRACT)
    with BuildSketch(Plane(origin=(363.452500451, 0, 30), x_dir=(1, 0, 0), z_dir=(0, -1, 0))) as fillet3_piece_4:
        with BuildLine():
            CenterArc((18.251980432, -5), FILLET3_R, 90, 53.130102354)
            Line((14.251980432, -2), (14.171980432, -1.94))
            ThreePointArc((14.171980432, -1.94), (14.151980432, -1), (14.151980432, 0))
            Line((14.151980432, 0), (14.251980432, 0.1))
            Line((14.251980432, 0.1), (18.251980432, 0.1))
            Line((18.251980432, 0.1), (18.251980432, 0))
        make_face()
    revolve(axis=Axis((363.452500451, 0, 30), (0, 0, 1)), mode=Mode.SUBTRACT)
    with BuildSketch(Plane(origin=(162.739925575, 0, 30), x_dir=(0, -1, 0), z_dir=(1, 0, 0))) as fillet3_piece_5:
        with BuildLine():
            CenterArc((21.02057372 - FILLET3_R, FILLET3_R), FILLET3_R, 270, 90)
            Line((21.02057372 - FILLET3_R, 0), (21.02057372 - FILLET3_R, -FILLET3_R * 0.02))
            Line((21.02057372 - FILLET3_R, -FILLET3_R * 0.02), (21.02057372 + FILLET3_R * 0.02, -FILLET3_R * 0.02))
            Line((21.02057372 + FILLET3_R * 0.02, -FILLET3_R * 0.02), (21.02057372 + FILLET3_R * 0.02, FILLET3_R))
            Line((21.02057372 + FILLET3_R * 0.02, FILLET3_R), (21.02057372, FILLET3_R))
        make_face()
    revolve(axis=Axis((162.739925575, 0, 30), (0, 0, -1)), revolution_arc=180, mode=Mode.SUBTRACT)
    with BuildSketch(Plane(origin=(363.452500451, -21.02057372, 30), x_dir=(0, 0, -1), z_dir=(-1, 0, 0)), Plane(origin=(162.739925575, 21.02057372, 30), x_dir=(0, 0, -1), z_dir=(1, 0, 0))) as fillet3_piece_6:
        with BuildLine():
            CenterArc((FILLET3_R, -FILLET3_R), FILLET3_R, 90, 90)
            Line((0, -FILLET3_R), (-FILLET3_R * 0.02, -FILLET3_R))
            Line((-FILLET3_R * 0.02, -FILLET3_R), (-FILLET3_R * 0.02, FILLET3_R * 0.02))
            Line((-FILLET3_R * 0.02, FILLET3_R * 0.02), (FILLET3_R, FILLET3_R * 0.02))
            Line((FILLET3_R, FILLET3_R * 0.02), (FILLET3_R, 0))
        make_face()
    extrude(amount=200.712574876, mode=Mode.SUBTRACT)
    with BuildSketch(Plane(origin=(363.452500451, 0, 30), x_dir=(0, 1, 0), z_dir=(-1, 0, 0))) as fillet3_piece_7:
        with BuildLine():
            CenterArc((21.02057372 - FILLET3_R, FILLET3_R), FILLET3_R, 270, 90)
            Line((21.02057372 - FILLET3_R, 0), (21.02057372 - FILLET3_R, -FILLET3_R * 0.02))
            Line((21.02057372 - FILLET3_R, -FILLET3_R * 0.02), (21.02057372 + FILLET3_R * 0.02, -FILLET3_R * 0.02))
            Line((21.02057372 + FILLET3_R * 0.02, -FILLET3_R * 0.02), (21.02057372 + FILLET3_R * 0.02, FILLET3_R))
            Line((21.02057372 + FILLET3_R * 0.02, FILLET3_R), (21.02057372, FILLET3_R))
        make_face()
    revolve(axis=Axis((363.452500451, 0, 30), (0, 0, -1)), revolution_arc=180, mode=Mode.SUBTRACT)

    # Fillet4
    fillet4_edges = [part.edges().sort_by_distance(p)[0] for p in [
        (351.91452864, 0, 40),
    ]]
    fillet(fillet4_edges, radius=FILLET4_R)

    # Sketch14 → Boss-Extrude5 (add)
    with BuildSketch(Plane.XY.offset(10).offset(BOSS_EXTRUDE5_START)):
        with BuildLine():
            Line((404.219655333, 132.390536508), (404.219655333, 396.67394534))
            ThreePointArc((404.219655333, 396.67394534), (391.039460487, 428.493750493), (359.219655333, 441.67394534))
            Line((359.219655333, 441.67394534), (-359.219655333, 441.67394534))
            ThreePointArc((-359.219655333, 441.67394534), (-391.039460487, 428.493750493), (-404.219655333, 396.67394534))
            Line((-404.219655333, 396.67394534), (-404.219655333, 132.390536508))
            ThreePointArc((-404.219655333, 132.390536508), (-391.039460487, 100.570731354), (-359.219655333, 87.390536508))
            Line((-359.219655333, 87.390536508), (359.219655333, 87.390536508))
            ThreePointArc((359.219655333, 87.390536508), (391.039460487, 100.570731354), (404.219655333, 132.390536508))
        make_face()
        with BuildLine():
            Line((389.219655333, 132.390536508), (389.219655333, 396.67394534))
            ThreePointArc((389.219655333, 396.67394534), (380.432858769, 417.887148775), (359.219655333, 426.67394534))
            Line((359.219655333, 426.67394534), (-359.219655333, 426.67394534))
            ThreePointArc((-359.219655333, 426.67394534), (-380.432858769, 417.887148775), (-389.219655333, 396.67394534))
            Line((-389.219655333, 396.67394534), (-389.219655333, 132.390536508))
            ThreePointArc((-389.219655333, 132.390536508), (-380.432858769, 111.177333072), (-359.219655333, 102.390536508))
            Line((-359.219655333, 102.390536508), (359.219655333, 102.390536508))
            ThreePointArc((359.219655333, 102.390536508), (380.432858769, 111.177333072), (389.219655333, 132.390536508))
        make_face(mode=Mode.SUBTRACT)
    extrude(amount=-BOSS_EXTRUDE5_DEPTH)


solid = part.part
